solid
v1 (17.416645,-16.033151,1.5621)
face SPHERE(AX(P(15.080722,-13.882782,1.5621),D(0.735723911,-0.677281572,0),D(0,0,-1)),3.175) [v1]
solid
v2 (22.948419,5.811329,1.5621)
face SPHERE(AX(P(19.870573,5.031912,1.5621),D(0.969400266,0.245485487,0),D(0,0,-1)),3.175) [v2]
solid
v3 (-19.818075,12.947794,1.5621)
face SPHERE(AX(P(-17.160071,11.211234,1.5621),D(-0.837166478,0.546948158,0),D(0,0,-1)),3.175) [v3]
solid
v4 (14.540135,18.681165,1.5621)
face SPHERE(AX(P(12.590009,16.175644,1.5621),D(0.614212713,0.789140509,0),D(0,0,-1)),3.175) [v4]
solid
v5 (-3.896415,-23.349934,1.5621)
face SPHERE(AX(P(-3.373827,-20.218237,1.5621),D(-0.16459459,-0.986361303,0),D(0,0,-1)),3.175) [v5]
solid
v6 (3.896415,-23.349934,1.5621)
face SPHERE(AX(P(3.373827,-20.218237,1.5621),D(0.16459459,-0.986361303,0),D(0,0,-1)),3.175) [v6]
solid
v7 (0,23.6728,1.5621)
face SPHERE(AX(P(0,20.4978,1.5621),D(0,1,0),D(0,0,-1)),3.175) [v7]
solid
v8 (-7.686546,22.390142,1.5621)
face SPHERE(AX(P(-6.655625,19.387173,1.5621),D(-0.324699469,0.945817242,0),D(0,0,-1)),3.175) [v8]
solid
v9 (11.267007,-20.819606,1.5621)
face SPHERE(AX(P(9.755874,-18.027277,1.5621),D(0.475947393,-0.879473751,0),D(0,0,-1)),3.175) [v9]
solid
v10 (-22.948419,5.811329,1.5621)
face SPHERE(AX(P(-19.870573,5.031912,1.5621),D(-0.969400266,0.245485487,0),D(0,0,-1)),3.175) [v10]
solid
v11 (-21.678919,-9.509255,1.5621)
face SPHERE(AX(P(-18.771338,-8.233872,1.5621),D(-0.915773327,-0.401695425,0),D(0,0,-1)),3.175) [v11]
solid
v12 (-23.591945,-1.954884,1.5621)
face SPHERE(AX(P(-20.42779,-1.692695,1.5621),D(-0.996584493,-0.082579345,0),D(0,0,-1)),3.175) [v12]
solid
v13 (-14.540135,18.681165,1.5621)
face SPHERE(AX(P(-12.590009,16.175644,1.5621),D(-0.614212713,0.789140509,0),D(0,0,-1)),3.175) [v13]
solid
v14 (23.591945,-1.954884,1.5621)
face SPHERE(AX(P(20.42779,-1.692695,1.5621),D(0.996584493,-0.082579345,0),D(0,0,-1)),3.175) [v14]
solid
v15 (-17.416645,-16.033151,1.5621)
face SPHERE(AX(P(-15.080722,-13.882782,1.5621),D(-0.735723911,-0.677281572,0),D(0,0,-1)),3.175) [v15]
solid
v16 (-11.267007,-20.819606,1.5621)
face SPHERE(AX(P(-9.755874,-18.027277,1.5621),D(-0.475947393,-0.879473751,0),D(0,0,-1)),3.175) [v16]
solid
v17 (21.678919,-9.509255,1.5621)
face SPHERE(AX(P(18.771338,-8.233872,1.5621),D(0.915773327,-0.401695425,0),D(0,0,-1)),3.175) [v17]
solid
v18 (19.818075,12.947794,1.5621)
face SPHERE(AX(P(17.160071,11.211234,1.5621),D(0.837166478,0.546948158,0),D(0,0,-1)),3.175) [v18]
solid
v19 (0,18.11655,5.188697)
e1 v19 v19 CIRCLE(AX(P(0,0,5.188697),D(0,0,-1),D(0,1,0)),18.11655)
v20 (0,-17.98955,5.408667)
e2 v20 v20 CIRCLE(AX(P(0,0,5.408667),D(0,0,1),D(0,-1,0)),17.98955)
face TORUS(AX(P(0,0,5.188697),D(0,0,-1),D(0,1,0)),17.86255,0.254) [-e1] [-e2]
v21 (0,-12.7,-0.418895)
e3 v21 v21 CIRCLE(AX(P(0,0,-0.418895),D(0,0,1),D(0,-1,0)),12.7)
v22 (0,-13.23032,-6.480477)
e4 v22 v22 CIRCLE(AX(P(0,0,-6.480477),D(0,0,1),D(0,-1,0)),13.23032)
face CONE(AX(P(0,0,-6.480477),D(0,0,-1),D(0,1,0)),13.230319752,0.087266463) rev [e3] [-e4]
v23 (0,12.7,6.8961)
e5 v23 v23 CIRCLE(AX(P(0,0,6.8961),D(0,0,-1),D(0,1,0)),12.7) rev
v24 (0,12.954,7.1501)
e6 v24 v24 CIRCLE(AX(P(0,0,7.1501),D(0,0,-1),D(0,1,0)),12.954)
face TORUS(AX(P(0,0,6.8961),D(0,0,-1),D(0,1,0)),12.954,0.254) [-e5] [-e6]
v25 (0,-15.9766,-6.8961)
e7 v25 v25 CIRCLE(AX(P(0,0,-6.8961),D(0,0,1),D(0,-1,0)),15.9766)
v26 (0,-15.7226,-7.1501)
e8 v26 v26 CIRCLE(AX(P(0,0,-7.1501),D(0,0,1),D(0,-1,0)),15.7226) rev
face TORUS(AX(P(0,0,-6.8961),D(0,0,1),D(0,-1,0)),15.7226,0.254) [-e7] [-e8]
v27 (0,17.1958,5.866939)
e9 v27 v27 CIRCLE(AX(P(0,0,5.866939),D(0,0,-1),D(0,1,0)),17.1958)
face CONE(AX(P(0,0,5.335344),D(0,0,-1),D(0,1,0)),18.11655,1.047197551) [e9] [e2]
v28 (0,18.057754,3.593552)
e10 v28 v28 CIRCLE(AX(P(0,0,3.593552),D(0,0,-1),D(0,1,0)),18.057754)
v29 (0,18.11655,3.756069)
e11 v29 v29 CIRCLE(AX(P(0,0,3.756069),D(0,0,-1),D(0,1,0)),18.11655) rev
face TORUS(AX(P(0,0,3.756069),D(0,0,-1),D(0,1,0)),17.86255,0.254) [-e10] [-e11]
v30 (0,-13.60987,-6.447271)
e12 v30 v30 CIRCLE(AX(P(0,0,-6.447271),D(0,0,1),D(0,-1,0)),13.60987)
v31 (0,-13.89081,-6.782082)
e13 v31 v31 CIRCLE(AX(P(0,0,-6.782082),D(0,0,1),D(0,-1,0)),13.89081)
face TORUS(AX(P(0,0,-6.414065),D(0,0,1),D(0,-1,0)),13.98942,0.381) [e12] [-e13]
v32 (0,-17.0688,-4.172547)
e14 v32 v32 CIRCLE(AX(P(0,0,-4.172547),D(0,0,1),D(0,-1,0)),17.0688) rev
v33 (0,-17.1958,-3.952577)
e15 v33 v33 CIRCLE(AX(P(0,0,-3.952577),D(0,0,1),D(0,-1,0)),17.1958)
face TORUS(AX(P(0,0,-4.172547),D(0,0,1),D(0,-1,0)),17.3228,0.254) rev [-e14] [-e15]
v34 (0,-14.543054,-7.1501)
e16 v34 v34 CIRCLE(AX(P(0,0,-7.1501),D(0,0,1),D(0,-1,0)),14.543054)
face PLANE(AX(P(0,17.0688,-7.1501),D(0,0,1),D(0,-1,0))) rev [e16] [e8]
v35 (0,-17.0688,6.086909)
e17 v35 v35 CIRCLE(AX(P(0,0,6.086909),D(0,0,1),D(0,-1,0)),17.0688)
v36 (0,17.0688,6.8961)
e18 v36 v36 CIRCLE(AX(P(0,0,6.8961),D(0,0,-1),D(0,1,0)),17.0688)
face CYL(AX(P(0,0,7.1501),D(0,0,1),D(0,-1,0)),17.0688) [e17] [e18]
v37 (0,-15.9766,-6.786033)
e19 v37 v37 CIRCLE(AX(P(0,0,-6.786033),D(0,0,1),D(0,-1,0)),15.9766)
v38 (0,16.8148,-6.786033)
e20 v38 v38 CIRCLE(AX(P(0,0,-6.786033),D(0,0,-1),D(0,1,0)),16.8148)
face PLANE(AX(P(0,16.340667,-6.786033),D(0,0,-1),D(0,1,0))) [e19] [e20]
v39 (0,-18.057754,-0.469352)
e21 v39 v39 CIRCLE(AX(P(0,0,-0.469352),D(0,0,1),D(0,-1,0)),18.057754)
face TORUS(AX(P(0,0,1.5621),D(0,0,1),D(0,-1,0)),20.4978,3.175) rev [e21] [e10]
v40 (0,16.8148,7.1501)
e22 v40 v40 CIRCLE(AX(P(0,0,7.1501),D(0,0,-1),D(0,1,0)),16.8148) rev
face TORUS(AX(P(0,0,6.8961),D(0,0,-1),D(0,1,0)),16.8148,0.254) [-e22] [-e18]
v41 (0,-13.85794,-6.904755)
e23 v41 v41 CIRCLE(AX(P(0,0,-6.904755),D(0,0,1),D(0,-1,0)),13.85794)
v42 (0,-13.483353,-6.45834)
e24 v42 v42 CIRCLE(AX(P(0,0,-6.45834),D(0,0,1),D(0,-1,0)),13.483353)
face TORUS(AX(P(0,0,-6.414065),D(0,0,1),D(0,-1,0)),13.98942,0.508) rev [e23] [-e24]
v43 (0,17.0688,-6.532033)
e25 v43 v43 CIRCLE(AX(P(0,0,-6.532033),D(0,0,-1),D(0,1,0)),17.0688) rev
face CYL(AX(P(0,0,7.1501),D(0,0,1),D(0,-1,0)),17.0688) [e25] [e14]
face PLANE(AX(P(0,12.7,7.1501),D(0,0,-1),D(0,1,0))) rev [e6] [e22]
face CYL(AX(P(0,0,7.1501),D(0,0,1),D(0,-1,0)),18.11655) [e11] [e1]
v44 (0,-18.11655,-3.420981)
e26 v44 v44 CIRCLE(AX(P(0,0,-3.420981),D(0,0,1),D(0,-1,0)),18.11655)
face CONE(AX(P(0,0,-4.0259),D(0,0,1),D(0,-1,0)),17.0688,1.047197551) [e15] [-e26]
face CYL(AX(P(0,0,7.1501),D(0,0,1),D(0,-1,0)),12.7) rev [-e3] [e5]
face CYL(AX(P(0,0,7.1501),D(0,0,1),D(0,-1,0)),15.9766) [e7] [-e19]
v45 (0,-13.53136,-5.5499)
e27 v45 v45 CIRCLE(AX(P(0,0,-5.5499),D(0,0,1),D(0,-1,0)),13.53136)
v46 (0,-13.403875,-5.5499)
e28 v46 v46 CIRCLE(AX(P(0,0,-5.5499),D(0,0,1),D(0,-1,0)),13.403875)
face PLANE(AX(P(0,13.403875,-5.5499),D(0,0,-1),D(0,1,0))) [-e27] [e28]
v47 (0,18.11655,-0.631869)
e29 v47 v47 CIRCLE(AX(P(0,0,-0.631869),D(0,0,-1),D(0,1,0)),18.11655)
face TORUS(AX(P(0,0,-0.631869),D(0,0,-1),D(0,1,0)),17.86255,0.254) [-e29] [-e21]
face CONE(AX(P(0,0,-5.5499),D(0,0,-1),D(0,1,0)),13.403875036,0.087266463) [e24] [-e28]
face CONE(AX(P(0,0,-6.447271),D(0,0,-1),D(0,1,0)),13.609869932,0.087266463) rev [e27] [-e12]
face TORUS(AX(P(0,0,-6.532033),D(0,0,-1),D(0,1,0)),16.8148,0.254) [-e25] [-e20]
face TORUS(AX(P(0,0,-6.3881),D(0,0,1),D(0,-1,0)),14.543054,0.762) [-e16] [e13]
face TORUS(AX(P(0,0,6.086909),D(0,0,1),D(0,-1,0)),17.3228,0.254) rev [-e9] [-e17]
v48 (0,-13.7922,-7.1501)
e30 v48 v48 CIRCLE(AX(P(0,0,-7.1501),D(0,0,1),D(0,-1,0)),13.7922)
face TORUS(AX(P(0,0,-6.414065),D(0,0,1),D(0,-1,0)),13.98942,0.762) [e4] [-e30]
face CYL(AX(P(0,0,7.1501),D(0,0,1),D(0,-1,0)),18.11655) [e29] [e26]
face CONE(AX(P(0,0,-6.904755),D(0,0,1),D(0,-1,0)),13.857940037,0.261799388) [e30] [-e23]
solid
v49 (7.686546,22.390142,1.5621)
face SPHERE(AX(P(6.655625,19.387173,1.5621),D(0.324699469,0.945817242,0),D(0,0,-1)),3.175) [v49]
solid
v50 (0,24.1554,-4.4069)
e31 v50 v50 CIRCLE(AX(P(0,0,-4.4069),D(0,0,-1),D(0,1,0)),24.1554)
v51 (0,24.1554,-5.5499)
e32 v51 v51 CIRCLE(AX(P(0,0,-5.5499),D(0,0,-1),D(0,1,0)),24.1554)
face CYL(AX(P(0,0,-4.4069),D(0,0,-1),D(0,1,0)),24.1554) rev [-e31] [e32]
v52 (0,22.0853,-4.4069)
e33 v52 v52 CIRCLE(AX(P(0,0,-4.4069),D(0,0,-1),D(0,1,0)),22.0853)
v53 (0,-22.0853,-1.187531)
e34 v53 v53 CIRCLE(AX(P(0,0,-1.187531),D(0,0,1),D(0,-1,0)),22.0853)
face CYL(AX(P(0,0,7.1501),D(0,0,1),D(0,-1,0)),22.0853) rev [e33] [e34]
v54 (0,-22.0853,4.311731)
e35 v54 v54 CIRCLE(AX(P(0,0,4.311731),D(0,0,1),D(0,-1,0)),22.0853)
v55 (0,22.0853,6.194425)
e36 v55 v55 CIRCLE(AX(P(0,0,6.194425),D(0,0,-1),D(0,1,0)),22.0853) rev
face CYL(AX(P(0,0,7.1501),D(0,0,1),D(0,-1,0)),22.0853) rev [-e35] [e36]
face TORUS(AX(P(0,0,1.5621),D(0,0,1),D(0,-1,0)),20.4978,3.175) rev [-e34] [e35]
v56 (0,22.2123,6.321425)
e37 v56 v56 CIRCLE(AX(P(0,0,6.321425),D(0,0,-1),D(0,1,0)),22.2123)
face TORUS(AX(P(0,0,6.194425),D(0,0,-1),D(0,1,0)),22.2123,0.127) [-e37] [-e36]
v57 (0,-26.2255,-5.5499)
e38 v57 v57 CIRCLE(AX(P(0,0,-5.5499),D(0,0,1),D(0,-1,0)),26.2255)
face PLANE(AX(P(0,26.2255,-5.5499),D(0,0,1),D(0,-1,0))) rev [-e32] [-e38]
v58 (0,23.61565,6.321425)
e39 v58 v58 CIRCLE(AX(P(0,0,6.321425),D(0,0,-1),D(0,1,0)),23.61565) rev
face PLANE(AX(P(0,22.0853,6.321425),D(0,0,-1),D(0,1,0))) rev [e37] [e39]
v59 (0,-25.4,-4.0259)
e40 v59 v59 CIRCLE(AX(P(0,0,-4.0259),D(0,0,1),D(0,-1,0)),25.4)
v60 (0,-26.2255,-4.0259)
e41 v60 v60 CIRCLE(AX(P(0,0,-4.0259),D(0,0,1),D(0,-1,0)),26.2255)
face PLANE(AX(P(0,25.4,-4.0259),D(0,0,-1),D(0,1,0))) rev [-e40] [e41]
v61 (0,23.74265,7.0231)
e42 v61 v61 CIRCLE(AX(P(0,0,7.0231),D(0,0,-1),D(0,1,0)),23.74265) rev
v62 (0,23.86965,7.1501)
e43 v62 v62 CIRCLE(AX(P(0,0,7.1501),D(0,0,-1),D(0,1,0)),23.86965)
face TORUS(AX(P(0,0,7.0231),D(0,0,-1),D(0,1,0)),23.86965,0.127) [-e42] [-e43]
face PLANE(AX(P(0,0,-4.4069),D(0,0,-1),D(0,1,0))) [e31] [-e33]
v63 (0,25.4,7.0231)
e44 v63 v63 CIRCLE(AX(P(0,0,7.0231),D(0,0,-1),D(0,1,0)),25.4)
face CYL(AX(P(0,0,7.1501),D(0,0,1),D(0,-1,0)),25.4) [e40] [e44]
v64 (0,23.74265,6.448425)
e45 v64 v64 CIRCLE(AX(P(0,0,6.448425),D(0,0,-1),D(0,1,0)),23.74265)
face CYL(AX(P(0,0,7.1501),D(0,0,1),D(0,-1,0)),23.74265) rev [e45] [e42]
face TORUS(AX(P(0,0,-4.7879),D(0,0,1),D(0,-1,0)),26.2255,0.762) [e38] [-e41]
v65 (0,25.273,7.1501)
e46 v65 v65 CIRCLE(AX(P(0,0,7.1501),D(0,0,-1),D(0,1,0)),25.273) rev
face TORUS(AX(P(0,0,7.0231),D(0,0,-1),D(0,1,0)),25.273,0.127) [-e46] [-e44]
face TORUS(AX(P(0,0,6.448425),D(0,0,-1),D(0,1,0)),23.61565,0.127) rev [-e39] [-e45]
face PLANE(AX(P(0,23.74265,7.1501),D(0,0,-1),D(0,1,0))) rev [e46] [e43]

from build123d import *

# Parameters (mm, degrees)
FILLET4_R          = 0.762
CIRPATTERN3_COUNT  = 19
FILLET2_R          = 0.127
FILLET3_R          = 0.127
FILLET5_R          = 0.254
SKETCH12_R         = 24.1554
SKETCH12_R_2       = 22.0853
CUT_EXTRUDE1_DEPTH = 1.143


with BuildPart() as part:
    # Sketch2 → Revolve1 (revolve)
    with BuildSketch(Plane(origin=(0, 0, 0), x_dir=(0, 0, -1), z_dir=(1, 0, 0)), mode=Mode.PRIVATE) as revolve1_sk:
        with BuildLine():
            Line((4.0259, 25.4), (-7.1501, 25.4))
            Line((-7.1501, 25.4), (-7.1501, 23.74265))
            Line((-7.1501, 23.74265), (-6.321425, 23.74265))
            Line((-6.321425, 23.74265), (-6.321425, 22.0853))
            Line((-6.321425, 22.0853), (-4.311730657, 22.0853))
            ThreePointArc((-4.311730657, 22.0853), (-1.5621, 23.6728), (1.187530657, 22.0853))
            Line((1.187530657, 22.0853), (5.5499, 22.0853))
            Line((5.5499, 22.0853), (5.5499, 26.2255))
            ThreePointArc((5.5499, 26.2255), (4.7879, 26.9875), (4.0259, 26.2255))
            Line((4.0259, 26.2255), (4.0259, 25.4))
        make_face()
    revolve(revolve1_sk.sketch.rotate(Axis((0, 0, 7.1501), (0, 0, -1)), 180), axis=Axis((0, 0, 7.1501), (0, 0, -1)))

    # Fillet2
    fillet2_edges = [part.edges().sort_by_distance(p)[0] for p in [
        (0, 22.0853, 6.321425),
        (0, 23.74265, 6.321425),
    ]]
    fillet(fillet2_edges, radius=FILLET2_R)

    # Fillet3
    fillet3_edges = [part.edges().sort_by_distance(p)[0] for p in [
        (0, 23.74265, 7.1501),
        (0, 25.4, 7.1501),
    ]]
    fillet(fillet3_edges, radius=FILLET3_R)

    # Sketch12 → Cut-Extrude1 (cut)
    with BuildSketch(Plane(origin=(0, 0, -5.5499), x_dir=(-1, 0, 0), z_dir=(0, 0, -1))):
        with Locations(Location((0, 0, 0), (0, 0, 90))):
            Circle(SKETCH12_R)
        with Locations(Location((0, 0, 0), (0, 0, 270))):
            Circle(SKETCH12_R_2, mode=Mode.SUBTRACT)
    extrude(amount=-CUT_EXTRUDE1_DEPTH, mode=Mode.SUBTRACT)


with BuildPart() as body_2:
    # Sketch3 → Revolve2 (revolve)
    with BuildSketch(Plane(origin=(0, 0, 0), x_dir=(0, 0, -1), z_dir=(1, 0, 0)), mode=Mode.PRIVATE) as revolve2_sk:
        with BuildLine():
            Line((-7.1501, 17.0688), (-5.940262511, 17.0688))
            Line((-5.940262511, 17.0688), (-5.335343766, 18.11655))
            Line((-5.335343766, 18.11655), (-3.662165103, 18.11655))
            ThreePointArc((-3.662165103, 18.11655), (-1.5621, 17.3228), (0.537965103, 18.11655))
            Line((0.537965103, 18.11655), (3.420981255, 18.11655))
            Line((3.420981255, 18.11655), (4.0259, 17.0688))
            Line((4.0259, 17.0688), (7.1501, 17.0688))
            Line((7.1501, 17.0688), (7.1501, 12.7))
            Line((7.1501, 12.7), (-7.1501, 12.7))
            Line((-7.1501, 12.7), (-7.1501, 17.0688))
        make_face()
    revolve(revolve2_sk.sketch.rotate(Axis((0, 0, 7.1501), (0, 0, -1)), 180), axis=Axis((0, 0, 7.1501), (0, 0, -1)))

    # Sketch5 → Cut-Revolve2 (revolve, cut)
    with BuildSketch(Plane(origin=(0, 0, 0), x_dir=(0, 0, -1), z_dir=(1, 0, 0)), mode=Mode.PRIVATE) as cut_revolve2_sk:
        with BuildLine():
            Line((7.1501, 13.7922), (7.1501, 12.7))
            Line((7.1501, 12.7), (0.418894689, 12.7))
            Line((0.418894689, 12.7), (6.480477196, 13.230319752))
            ThreePointArc((6.480477196, 13.230319752), (6.903868679, 13.405694247), (7.1501, 13.7922))
        make_face()
    revolve(cut_revolve2_sk.sketch.rotate(Axis((0, 0, 7.1501), (0, 0, -1)), 180), axis=Axis((0, 0, 7.1501), (0, 0, -1)), mode=Mode.SUBTRACT)

    # Sketch6 → Cut-Revolve3 (revolve, cut)
    with BuildSketch(Plane(origin=(0, 0, 0), x_dir=(0, 0, -1), z_dir=(1, 0, 0)), mode=Mode.PRIVATE) as cut_revolve3_sk:
        with BuildLine():
            Line((6.90475484, 13.857940037), (7.1501, 13.7922))
            Line((7.1501, 13.7922), (7.1501, 13.890810056))
            Line((7.1501, 13.890810056), (6.78208226, 13.890810056))
            ThreePointArc((6.78208226, 13.890810056), (6.6589666, 13.69755718), (6.447270858, 13.609869932))
            Line((6.447270858, 13.609869932), (5.5499, 13.531360155))
            Line((5.5499, 13.531360155), (5.5499, 13.403875036))
            Line((5.5499, 13.403875036), (6.458339638, 13.483353206))
            ThreePointArc((6.458339638, 13.483353206), (6.740600626, 13.600269535), (6.90475484, 13.857940037))
        make_face()
    revolve(cut_revolve3_sk.sketch.rotate(Axis((0, 0, 7.1501), (0, 0, -1)), 180), axis=Axis((0, 0, 7.1501), (0, 0, -1)), mode=Mode.SUBTRACT)

    # Fillet4
    # the kernel refuses this fillet: 0.762 mm, written as the material it takes off along each edge
    with BuildSketch(Plane(origin=(0, 0, -7.1501), x_dir=(0, -1, 0), z_dir=(1, 0, 0))) as fillet4_piece_1:
        with BuildLine():
            CenterArc((14.543053859, -0.762), FILLET4_R, 90, 58.866285833)
            Line((13.890810056, -0.36801774), (13.87776518, -0.360138095))
            ThreePointArc((13.87776518, -0.360138095), (13.875570056, -0.18400887), (13.875570056, 0))
            Line((13.875570056, 0), (13.890810056, 0.01524))
            Line((13.890810056, 0.01524), (14.543053859, 0.01524))
            Line((14.543053859, 0.01524), (14.543053859, 0))
        make_face()
    revolve(axis=Axis((0, 0, -7.1501), (0, 0, -1)), mode=Mode.SUBTRACT)

    # Sketch7 → Cut-Revolve4 (revolve, cut)
    with BuildSketch(Plane(origin=(0, 0, 0), x_dir=(0, 0, -1), z_dir=(1, 0, 0)), mode=Mode.PRIVATE) as cut_revolve4_sk:
        Polygon((7.1501, 15.9766), (7.1501, 17.0688), (6.786033333, 17.0688), (6.786033333, 16.704733333), (6.786033333, 16.340666667), (6.786033333, 15.9766), align=None)
    revolve(cut_revolve4_sk.sketch.rotate(Axis((0, 0, 7.1501), (0, 0, -1)), 180), axis=Axis((0, 0, 7.1501), (0, 0, -1)), mode=Mode.SUBTRACT)

    # Fillet5
    fillet5_edges = [body_2.edges().sort_by_distance(p)[0] for p in [
        (0, 12.7, 7.1501),
        (0, 15.9766, -7.1501),
        (0, 17.0688, -6.786033333),
        (0, 17.0688, 7.1501),
        (0, 17.0688, 5.940262511),
        (0, 18.11655, 5.335343766),
        (0, 18.11655, 3.662165103),
        (0, 18.11655, -0.537965103),
        (0, 17.0688, -4.0259),
    ]]
    fillet(fillet5_edges, radius=FILLET5_R)


with BuildPart() as body_3:
    # Sketch11 → Revolve3 (revolve)
    with BuildSketch(Plane(origin=(0, 0, 0), x_dir=(0, 0, -1), z_dir=(1, 0, 0))):
        with BuildLine():
            Line((-1.5621, 23.6728), (-1.5621, 17.3228))
            ThreePointArc((-1.5621, 17.3228), (1.6129, 20.4978), (-1.5621, 23.6728))
        make_face()
    revolve(axis=Axis((0, 23.6728, 1.5621), (0, -1, 0)))


with BuildPart() as cirpattern3_1:
    # CirPattern3: pattern copy
    add(body_3.part.rotate(Axis((0, 0, 0), (0, 0, 1)), 1 * 360 / CIRPATTERN3_COUNT))


with BuildPart() as cirpattern3_2:
    # CirPattern3: pattern copy
    add(body_3.part.rotate(Axis((0, 0, 0), (0, 0, 1)), 2 * 360 / CIRPATTERN3_COUNT))


with BuildPart() as cirpattern3_3:
    # CirPattern3: pattern copy
    add(body_3.part.rotate(Axis((0, 0, 0), (0, 0, 1)), 3 * 360 / CIRPATTERN3_COUNT))


with BuildPart() as cirpattern3_4:
    # CirPattern3: pattern copy
    add(body_3.part.rotate(Axis((0, 0, 0), (0, 0, 1)), 4 * 360 / CIRPATTERN3_COUNT))


with BuildPart() as cirpattern3_5:
    # CirPattern3: pattern copy
    add(body_3.part.rotate(Axis((0, 0, 0), (0, 0, 1)), 5 * 360 / CIRPATTERN3_COUNT))


with BuildPart() as cirpattern3_6:
    # CirPattern3: pattern copy
    add(body_3.part.rotate(Axis((0, 0, 0), (0, 0, 1)), 6 * 360 / CIRPATTERN3_COUNT))


with BuildPart() as cirpattern3_7:
    # CirPattern3: pattern copy
    add(body_3.part.rotate(Axis((0, 0, 0), (0, 0, 1)), 7 * 360 / CIRPATTERN3_COUNT))


with BuildPart() as cirpattern3_8:
    # CirPattern3: pattern copy
    add(body_3.part.rotate(Axis((0, 0, 0), (0, 0, 1)), 8 * 360 / CIRPATTERN3_COUNT))


with BuildPart() as cirpattern3_9:
    # CirPattern3: pattern copy
    add(body_3.part.rotate(Axis((0, 0, 0), (0, 0, 1)), 9 * 360 / CIRPATTERN3_COUNT))


with BuildPart() as cirpattern3_10:
    # CirPattern3: pattern copy
    add(body_3.part.rotate(Axis((0, 0, 0), (0, 0, 1)), 10 * 360 / CIRPATTERN3_COUNT))


with BuildPart() as cirpattern3_11:
    # CirPattern3: pattern copy
    add(body_3.part.rotate(Axis((0, 0, 0), (0, 0, 1)), 11 * 360 / CIRPATTERN3_COUNT))


with BuildPart() as cirpattern3_12:
    # CirPattern3: pattern copy
    add(body_3.part.rotate(Axis((0, 0, 0), (0, 0, 1)), 12 * 360 / CIRPATTERN3_COUNT))


with BuildPart() as cirpattern3_13:
    # CirPattern3: pattern copy
    add(body_3.part.rotate(Axis((0, 0, 0), (0, 0, 1)), 13 * 360 / CIRPATTERN3_COUNT))


with BuildPart() as cirpattern3_14:
    # CirPattern3: pattern copy
    add(body_3.part.rotate(Axis((0, 0, 0), (0, 0, 1)), 14 * 360 / CIRPATTERN3_COUNT))


with BuildPart() as cirpattern3_15:
    # CirPattern3: pattern copy
    add(body_3.part.rotate(Axis((0, 0, 0), (0, 0, 1)), 15 * 360 / CIRPATTERN3_COUNT))


with BuildPart() as cirpattern3_16:
    # CirPattern3: pattern copy
    add(body_3.part.rotate(Axis((0, 0, 0), (0, 0, 1)), 16 * 360 / CIRPATTERN3_COUNT))


with BuildPart() as cirpattern3_17:
    # CirPattern3: pattern copy
    add(body_3.part.rotate(Axis((0, 0, 0), (0, 0, 1)), 17 * 360 / CIRPATTERN3_COUNT))


with BuildPart() as cirpattern3_18:
    # CirPattern3: pattern copy
    add(body_3.part.rotate(Axis((0, 0, 0), (0, 0, 1)), 18 * 360 / CIRPATTERN3_COUNT))


solid = Compound([part.part, body_2.part, body_3.part, cirpattern3_1.part, cirpattern3_2.part, cirpattern3_3.part, cirpattern3_4.part, cirpattern3_5.part, cirpattern3_6.part, cirpattern3_7.part, cirpattern3_8.part, cirpattern3_9.part, cirpattern3_10.part, cirpattern3_11.part, cirpattern3_12.part, cirpattern3_13.part, cirpattern3_14.part, cirpattern3_15.part, cirpattern3_16.part, cirpattern3_17.part, cirpattern3_18.part])
